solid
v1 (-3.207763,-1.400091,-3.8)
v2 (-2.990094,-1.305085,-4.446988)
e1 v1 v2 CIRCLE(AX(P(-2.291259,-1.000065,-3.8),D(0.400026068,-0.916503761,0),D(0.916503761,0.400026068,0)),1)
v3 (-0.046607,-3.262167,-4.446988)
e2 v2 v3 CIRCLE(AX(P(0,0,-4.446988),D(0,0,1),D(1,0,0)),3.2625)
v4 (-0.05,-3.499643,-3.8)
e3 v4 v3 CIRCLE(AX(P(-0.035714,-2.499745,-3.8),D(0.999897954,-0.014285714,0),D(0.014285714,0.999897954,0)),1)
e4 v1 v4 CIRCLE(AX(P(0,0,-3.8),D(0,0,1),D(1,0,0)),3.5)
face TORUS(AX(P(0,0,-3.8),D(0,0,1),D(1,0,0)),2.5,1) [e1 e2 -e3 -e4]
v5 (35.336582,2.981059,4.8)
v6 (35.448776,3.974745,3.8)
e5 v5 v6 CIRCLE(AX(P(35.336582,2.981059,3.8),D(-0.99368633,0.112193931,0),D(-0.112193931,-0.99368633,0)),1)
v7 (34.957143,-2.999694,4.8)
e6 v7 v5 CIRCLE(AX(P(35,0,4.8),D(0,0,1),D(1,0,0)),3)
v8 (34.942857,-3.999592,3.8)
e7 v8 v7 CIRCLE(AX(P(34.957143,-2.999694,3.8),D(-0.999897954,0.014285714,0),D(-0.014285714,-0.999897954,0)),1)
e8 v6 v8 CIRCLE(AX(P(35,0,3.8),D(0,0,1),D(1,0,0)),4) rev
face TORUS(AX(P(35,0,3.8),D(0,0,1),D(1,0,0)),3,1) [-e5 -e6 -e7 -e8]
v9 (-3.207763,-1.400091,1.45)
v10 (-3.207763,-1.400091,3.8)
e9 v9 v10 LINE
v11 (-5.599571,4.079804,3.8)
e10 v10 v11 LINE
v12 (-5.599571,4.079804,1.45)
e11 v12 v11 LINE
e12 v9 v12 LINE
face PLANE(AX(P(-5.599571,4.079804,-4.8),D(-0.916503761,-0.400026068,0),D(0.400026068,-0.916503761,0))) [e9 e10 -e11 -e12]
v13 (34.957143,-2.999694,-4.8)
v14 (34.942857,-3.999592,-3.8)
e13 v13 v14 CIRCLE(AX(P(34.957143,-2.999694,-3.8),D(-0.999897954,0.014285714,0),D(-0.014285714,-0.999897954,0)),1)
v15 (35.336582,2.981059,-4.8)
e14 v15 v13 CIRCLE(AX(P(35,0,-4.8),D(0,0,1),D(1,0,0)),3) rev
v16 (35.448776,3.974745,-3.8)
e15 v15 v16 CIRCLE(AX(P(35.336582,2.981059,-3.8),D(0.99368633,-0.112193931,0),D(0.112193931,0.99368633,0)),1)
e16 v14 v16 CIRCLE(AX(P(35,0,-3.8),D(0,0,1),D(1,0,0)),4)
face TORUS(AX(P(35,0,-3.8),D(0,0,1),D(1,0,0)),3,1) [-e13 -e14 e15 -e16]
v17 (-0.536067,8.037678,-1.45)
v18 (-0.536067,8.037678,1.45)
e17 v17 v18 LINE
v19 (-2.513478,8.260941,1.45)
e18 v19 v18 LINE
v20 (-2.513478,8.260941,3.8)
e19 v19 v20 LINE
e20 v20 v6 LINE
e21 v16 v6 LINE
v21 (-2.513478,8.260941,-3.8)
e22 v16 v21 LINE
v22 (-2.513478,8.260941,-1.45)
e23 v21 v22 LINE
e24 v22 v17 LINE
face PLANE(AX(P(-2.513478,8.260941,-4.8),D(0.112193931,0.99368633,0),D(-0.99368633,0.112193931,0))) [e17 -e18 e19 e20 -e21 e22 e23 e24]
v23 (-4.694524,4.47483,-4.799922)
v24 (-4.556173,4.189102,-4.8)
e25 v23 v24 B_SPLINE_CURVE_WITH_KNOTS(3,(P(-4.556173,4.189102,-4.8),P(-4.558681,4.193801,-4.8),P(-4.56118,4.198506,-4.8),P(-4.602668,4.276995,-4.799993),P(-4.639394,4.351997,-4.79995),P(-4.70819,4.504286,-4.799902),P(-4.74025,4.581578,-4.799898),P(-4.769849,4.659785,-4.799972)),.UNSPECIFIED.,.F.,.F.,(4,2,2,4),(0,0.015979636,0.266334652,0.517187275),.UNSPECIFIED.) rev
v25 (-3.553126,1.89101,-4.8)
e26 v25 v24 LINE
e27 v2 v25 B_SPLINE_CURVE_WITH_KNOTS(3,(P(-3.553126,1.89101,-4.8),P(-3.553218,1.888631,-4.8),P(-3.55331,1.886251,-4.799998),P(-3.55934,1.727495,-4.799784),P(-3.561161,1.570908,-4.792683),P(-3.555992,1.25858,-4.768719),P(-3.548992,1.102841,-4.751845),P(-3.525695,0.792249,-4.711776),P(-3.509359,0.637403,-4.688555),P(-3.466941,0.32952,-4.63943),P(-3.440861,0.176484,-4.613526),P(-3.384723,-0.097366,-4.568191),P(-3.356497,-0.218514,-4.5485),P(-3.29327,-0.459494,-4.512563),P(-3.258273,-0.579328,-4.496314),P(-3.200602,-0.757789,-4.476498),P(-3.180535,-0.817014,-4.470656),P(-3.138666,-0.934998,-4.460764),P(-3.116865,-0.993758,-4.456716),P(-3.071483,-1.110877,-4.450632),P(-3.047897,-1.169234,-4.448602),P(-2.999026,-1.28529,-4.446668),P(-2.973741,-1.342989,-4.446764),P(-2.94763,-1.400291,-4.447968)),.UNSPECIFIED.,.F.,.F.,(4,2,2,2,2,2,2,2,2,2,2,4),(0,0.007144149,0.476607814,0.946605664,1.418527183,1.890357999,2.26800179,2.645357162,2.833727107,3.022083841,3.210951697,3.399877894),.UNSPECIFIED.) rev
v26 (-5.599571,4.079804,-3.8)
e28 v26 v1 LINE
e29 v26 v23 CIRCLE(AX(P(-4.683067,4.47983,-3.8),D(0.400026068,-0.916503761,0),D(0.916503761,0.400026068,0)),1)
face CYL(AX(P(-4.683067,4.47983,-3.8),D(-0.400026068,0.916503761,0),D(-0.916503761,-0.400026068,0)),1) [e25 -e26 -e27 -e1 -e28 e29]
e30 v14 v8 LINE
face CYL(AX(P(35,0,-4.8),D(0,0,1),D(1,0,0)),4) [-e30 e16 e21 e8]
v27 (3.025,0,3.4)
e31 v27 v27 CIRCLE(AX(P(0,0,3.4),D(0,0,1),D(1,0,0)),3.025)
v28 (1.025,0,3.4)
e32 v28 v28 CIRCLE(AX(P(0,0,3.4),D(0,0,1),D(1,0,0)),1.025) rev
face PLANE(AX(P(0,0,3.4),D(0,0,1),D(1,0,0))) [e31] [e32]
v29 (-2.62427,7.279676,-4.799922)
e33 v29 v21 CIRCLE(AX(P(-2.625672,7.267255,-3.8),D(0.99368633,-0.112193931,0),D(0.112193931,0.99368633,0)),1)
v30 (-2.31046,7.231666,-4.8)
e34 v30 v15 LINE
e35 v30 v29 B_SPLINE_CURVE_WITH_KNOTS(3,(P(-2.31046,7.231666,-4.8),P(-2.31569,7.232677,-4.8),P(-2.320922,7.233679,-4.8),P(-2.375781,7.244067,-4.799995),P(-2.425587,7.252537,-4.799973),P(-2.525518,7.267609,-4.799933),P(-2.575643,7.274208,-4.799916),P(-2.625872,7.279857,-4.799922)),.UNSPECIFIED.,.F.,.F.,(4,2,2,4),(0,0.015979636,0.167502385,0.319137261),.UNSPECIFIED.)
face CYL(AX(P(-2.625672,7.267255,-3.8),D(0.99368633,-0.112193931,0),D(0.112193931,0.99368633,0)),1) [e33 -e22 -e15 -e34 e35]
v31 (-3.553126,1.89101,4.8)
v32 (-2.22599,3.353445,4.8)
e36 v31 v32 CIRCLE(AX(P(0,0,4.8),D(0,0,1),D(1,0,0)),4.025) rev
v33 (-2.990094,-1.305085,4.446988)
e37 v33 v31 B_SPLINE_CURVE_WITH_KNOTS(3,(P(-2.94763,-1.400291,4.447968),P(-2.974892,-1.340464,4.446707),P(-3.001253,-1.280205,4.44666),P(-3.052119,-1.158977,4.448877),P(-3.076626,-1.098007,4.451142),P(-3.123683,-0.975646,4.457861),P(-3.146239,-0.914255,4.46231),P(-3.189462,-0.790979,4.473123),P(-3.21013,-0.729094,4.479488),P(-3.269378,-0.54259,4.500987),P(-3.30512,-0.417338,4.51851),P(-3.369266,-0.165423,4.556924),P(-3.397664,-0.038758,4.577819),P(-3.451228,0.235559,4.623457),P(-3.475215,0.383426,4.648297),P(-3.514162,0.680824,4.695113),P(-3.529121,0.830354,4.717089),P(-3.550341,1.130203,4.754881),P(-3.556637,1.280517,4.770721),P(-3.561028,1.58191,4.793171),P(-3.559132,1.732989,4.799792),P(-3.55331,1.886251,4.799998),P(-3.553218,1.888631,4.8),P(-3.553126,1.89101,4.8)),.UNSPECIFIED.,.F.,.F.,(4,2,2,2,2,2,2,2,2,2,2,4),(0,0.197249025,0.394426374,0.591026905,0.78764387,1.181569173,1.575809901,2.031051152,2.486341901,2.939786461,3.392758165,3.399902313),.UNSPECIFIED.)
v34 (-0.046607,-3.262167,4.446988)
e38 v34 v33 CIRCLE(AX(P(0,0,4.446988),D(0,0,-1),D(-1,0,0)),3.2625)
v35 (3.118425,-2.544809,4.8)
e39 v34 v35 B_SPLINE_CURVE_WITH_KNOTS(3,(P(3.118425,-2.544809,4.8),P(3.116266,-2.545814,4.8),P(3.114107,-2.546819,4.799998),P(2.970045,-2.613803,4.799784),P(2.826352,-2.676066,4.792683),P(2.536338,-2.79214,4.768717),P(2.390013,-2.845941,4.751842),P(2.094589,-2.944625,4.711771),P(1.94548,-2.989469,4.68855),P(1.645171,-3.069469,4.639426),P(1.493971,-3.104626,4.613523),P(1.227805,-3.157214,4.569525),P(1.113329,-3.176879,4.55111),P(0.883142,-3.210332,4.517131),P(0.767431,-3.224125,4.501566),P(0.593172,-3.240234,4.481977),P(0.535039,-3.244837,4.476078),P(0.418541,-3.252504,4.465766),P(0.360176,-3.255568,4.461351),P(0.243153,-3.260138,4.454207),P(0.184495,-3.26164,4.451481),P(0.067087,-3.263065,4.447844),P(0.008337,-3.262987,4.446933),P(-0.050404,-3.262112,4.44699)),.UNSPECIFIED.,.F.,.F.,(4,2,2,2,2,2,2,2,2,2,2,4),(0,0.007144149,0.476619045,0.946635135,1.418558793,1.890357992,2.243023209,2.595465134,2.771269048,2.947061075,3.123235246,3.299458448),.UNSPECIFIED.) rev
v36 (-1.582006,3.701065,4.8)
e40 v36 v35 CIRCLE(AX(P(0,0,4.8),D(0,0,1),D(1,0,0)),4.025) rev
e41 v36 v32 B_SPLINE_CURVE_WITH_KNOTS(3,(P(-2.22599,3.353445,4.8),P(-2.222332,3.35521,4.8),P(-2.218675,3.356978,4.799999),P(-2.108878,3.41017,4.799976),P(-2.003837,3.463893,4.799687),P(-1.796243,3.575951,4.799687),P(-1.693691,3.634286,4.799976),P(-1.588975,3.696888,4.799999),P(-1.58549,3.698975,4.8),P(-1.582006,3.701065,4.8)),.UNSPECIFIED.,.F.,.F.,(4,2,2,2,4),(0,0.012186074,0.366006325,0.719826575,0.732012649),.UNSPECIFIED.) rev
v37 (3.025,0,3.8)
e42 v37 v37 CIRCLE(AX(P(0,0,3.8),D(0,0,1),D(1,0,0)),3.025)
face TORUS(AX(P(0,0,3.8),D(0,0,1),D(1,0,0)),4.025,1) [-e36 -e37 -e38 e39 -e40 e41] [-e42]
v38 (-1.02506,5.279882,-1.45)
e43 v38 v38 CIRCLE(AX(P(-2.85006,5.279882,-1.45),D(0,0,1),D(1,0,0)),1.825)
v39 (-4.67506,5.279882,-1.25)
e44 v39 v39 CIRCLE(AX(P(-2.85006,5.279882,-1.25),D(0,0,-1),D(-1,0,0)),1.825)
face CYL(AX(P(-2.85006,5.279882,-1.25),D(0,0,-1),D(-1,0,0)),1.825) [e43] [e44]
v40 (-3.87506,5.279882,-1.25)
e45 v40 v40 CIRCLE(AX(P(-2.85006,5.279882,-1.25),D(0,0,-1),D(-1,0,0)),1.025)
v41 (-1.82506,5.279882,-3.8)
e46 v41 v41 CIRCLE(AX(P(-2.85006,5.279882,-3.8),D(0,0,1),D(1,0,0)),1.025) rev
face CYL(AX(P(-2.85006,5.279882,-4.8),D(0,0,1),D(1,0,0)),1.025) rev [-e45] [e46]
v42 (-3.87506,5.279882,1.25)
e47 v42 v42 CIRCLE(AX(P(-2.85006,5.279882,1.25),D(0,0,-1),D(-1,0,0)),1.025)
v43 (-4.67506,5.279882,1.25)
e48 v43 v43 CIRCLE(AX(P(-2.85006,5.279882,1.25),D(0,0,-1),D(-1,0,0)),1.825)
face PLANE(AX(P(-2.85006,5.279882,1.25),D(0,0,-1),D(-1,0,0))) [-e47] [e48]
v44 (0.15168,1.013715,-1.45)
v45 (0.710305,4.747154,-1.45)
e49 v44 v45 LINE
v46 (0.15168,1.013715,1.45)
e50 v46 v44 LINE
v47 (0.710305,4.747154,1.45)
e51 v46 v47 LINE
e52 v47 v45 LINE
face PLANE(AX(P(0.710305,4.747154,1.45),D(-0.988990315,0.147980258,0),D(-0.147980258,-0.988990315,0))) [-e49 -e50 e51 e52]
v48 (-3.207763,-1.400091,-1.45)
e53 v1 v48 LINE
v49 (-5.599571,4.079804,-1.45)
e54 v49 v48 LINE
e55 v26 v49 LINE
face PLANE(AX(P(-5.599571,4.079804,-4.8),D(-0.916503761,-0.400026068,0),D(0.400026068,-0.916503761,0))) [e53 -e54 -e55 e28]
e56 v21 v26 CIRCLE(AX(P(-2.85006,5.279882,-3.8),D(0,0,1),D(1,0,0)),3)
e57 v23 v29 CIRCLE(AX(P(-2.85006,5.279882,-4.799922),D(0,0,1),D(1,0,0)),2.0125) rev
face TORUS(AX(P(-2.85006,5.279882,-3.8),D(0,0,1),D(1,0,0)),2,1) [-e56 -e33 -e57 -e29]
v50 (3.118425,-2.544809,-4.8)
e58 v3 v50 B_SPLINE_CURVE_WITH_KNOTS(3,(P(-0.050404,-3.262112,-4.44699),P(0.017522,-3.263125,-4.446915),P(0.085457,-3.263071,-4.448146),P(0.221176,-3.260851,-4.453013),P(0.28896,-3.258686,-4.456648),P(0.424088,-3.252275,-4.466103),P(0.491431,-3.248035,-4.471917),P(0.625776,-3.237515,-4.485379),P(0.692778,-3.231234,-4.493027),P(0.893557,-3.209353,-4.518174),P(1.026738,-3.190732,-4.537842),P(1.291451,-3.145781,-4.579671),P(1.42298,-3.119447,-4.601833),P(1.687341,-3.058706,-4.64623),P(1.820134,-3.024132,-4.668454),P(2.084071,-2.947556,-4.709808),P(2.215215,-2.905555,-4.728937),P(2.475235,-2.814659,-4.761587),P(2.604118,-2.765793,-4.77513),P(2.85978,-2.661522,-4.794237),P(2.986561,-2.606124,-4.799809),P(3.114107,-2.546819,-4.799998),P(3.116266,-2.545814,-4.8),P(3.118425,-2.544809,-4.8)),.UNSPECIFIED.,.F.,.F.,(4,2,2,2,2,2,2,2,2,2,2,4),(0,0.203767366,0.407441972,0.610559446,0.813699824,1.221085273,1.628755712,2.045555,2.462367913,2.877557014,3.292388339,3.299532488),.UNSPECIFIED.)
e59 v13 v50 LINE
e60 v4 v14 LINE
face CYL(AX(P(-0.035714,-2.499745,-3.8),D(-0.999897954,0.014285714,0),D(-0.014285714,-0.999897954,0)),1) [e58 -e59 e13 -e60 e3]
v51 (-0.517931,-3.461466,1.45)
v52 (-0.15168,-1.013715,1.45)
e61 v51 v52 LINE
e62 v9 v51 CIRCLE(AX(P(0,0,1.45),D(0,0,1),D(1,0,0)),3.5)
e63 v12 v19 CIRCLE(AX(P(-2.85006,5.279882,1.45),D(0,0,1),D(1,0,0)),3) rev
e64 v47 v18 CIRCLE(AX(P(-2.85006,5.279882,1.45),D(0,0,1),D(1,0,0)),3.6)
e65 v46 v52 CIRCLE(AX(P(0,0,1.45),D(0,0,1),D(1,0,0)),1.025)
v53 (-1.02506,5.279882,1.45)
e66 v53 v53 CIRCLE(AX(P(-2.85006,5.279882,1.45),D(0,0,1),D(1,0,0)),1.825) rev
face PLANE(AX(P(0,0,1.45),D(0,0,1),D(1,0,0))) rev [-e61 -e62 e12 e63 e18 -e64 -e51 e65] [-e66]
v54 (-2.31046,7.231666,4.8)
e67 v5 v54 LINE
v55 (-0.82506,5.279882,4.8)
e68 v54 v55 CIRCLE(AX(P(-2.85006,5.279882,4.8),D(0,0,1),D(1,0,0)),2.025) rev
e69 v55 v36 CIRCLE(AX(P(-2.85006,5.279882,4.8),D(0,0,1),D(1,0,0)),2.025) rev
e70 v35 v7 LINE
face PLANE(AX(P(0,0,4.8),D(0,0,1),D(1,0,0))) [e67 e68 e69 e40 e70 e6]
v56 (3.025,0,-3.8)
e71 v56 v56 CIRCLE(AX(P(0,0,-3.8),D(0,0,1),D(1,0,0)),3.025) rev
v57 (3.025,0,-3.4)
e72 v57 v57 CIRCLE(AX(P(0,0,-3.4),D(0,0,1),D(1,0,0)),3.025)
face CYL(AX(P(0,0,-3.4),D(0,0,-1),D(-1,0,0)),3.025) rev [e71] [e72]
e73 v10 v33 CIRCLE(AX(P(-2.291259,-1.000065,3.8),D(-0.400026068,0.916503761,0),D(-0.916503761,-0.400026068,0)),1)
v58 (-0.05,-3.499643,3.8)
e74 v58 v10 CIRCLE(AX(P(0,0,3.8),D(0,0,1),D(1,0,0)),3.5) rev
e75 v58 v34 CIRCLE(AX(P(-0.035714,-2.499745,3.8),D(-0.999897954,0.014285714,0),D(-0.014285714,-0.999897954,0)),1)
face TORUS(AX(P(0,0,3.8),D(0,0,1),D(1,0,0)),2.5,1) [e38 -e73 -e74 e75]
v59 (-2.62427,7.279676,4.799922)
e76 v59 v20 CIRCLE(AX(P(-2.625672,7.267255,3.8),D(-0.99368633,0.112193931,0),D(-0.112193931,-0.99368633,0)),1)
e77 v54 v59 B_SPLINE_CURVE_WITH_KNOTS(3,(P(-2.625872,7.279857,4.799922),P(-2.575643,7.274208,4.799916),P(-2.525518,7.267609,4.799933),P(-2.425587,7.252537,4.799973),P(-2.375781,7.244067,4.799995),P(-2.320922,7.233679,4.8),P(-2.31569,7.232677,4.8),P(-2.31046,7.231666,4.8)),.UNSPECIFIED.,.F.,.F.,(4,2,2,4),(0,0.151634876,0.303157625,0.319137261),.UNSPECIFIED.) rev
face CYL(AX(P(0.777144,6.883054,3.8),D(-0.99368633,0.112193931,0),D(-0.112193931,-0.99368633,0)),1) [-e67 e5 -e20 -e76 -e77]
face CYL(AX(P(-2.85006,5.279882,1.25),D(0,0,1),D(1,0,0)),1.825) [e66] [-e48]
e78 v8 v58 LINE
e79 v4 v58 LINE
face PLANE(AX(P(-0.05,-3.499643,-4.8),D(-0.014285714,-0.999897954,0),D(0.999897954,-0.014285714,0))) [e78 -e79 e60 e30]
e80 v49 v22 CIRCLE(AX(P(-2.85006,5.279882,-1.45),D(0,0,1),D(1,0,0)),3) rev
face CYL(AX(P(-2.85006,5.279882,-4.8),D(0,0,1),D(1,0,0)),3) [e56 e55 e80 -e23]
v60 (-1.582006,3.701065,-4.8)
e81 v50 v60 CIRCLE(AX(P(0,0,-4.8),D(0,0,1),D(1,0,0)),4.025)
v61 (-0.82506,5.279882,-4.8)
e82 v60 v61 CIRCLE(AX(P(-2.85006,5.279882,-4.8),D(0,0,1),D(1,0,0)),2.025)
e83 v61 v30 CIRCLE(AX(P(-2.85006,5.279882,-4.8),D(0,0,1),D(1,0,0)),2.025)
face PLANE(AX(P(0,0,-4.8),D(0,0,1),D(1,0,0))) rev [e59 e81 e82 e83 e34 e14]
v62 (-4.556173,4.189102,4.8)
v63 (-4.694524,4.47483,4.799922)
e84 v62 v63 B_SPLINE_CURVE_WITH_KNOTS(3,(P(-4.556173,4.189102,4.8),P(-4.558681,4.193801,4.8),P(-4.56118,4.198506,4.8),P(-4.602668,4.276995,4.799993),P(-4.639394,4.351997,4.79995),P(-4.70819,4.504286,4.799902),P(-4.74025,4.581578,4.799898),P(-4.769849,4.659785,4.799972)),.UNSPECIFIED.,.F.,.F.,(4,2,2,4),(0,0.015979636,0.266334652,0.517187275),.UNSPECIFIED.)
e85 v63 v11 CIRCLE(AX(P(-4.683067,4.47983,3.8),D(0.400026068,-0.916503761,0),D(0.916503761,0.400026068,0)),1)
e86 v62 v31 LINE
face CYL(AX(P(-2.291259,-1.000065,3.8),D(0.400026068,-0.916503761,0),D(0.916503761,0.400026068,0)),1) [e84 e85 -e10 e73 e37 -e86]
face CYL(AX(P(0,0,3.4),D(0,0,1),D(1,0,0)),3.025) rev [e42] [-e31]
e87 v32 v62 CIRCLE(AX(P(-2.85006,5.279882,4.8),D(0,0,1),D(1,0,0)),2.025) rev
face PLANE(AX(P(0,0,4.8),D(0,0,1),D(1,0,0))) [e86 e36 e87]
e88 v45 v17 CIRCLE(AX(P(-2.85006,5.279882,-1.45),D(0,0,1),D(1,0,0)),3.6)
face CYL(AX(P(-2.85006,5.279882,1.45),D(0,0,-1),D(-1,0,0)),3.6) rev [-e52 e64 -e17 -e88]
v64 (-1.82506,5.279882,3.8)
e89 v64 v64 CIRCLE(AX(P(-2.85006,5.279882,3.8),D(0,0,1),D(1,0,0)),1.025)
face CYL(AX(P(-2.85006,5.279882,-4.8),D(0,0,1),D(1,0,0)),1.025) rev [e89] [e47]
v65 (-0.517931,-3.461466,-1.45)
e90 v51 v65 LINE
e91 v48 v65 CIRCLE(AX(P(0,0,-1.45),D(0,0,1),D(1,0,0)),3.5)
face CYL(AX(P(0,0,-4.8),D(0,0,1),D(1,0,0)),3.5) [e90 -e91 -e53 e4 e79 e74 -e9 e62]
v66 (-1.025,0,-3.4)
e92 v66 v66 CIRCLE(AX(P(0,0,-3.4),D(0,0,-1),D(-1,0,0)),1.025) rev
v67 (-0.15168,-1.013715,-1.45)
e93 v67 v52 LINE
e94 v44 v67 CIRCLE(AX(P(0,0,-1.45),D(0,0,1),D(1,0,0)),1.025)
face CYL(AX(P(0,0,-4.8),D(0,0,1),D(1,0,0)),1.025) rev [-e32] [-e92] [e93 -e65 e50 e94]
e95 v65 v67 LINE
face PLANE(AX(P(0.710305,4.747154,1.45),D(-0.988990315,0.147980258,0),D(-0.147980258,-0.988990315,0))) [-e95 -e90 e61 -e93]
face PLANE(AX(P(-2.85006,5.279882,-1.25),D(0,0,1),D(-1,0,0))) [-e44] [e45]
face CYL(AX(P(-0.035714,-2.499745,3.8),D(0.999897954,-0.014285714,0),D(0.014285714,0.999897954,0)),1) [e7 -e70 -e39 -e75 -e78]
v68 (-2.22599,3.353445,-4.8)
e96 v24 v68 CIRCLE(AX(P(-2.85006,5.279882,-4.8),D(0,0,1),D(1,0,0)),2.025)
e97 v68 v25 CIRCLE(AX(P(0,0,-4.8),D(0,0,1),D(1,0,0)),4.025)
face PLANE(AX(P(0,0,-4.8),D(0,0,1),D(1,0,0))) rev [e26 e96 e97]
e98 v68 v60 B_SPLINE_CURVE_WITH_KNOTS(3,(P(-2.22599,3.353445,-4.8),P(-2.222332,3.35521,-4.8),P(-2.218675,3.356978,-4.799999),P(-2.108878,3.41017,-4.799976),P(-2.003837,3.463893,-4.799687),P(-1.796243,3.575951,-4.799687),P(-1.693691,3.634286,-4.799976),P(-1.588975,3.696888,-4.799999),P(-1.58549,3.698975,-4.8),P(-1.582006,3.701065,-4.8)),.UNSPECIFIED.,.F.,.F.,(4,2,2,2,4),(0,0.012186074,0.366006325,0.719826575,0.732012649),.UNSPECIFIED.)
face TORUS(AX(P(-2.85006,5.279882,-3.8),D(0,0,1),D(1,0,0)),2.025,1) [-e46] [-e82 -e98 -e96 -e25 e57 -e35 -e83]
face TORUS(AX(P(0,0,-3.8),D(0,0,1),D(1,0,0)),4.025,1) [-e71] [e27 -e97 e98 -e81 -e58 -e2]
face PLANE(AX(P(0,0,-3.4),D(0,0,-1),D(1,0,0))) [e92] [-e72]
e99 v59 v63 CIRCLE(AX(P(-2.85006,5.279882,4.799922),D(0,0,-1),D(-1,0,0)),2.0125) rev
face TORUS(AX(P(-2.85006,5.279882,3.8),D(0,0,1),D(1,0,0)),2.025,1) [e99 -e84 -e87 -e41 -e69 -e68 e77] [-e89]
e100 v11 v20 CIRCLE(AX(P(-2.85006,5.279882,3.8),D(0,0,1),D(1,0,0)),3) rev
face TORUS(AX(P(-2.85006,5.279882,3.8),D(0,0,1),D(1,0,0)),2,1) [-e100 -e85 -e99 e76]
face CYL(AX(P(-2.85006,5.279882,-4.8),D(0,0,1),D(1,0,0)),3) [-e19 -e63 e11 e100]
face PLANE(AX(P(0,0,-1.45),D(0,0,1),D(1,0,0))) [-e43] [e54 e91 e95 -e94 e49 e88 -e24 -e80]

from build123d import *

# Parameters (mm, degrees)
EXTRUDE_1_DEPTH          = 4.8
EXTRUDE_1_DEPTH_BACK     = 4.8
CUT_EXTRUDE_1_DEPTH      = 1.45
CUT_EXTRUDE_1_DEPTH_BACK = 1.45
CUT_EXTRUDE_2_DEPTH      = 41.157146976
CUT_EXTRUDE_2_DEPTH_BACK = 41.157146976
SKETCH_4_R               = 1.025
SKETCH_5_R               = 1.825
SKETCH_5_R_2             = 1.025
EXTRUDE_2_DEPTH          = 0.2
SKETCH_6_R               = 3.025
CUT_EXTRUDE_3_DEPTH      = 1.4
FILLET_1_R               = 1


with BuildPart() as part:
    # 草图2 → 凸台-拉伸1 (new, two sides: drawn at the far end of the back side and taken through both)
    with BuildSketch(Plane.XY.offset(-EXTRUDE_1_DEPTH_BACK)):
        with BuildLine():
            Line((-5.59957118, 4.079804236), (-3.207763165, -1.40009124))
            ThreePointArc((-3.207763165, -1.40009124), (-1.937855629, -2.914569533), (-0.05, -3.499642839))
            Line((-0.05, -3.499642839), (34.942857143, -3.999591816))
            ThreePointArc((34.942857143, -3.999591816), (38.991974106, -0.25326417), (35.448775724, 3.974745319))
            Line((35.448775724, 3.974745319), (-2.513478103, 8.26094143))
            ThreePointArc((-2.513478103, 8.26094143), (-5.263777825, 7.06144517), (-5.59957118, 4.079804236))
        make_face()
    extrude(amount=EXTRUDE_1_DEPTH + EXTRUDE_1_DEPTH_BACK)

    # 草图3 → 切除-拉伸1 (cut, two sides: drawn at the far end of the back side and taken through both)
    with BuildSketch(Plane.XY.offset(-CUT_EXTRUDE_1_DEPTH_BACK)):
        with BuildLine():
            Line((0.710305238, 4.747153512), (-0.517930903, -3.461466103))
            ThreePointArc((-0.517930903, -3.461466103), (-2.128970562, -2.778036059), (-3.207763165, -1.40009124))
            Line((-3.207763165, -1.40009124), (-4.803529355, 2.255984778))
            ThreePointArc((-4.803529355, 2.255984778), (-4.332290932, 8.560582238), (0.710305238, 4.747153512))
        make_face()
    extrude(amount=CUT_EXTRUDE_1_DEPTH + CUT_EXTRUDE_1_DEPTH_BACK, mode=Mode.SUBTRACT)

    # 草图4 → 切除-拉伸2 (cut, two sides: drawn at the far end of the back side and taken through both)
    with BuildSketch(Plane.XY.offset(-CUT_EXTRUDE_2_DEPTH_BACK)):
        with Locations((-2.850059896, 5.279882441)):
            Circle(SKETCH_4_R)
        Circle(SKETCH_4_R)
    extrude(amount=CUT_EXTRUDE_2_DEPTH + CUT_EXTRUDE_2_DEPTH_BACK, mode=Mode.SUBTRACT)

    # 草图5 → 凸台-拉伸2 (add)
    with BuildSketch(Plane(origin=(0, 0, 1.45), x_dir=(-1, 0, 0), z_dir=(0, 0, -1))):
        with Locations(Location((2.850059896, 5.279882441, 0), (0, 0, 180))):
            Circle(SKETCH_5_R)
        with Locations(Location((2.850059896, 5.279882441, 0), (0, 0, 180))):
            Circle(SKETCH_5_R_2, mode=Mode.SUBTRACT)
    extrude_2 = extrude(amount=EXTRUDE_2_DEPTH)

    # 镜向1: 凸台-拉伸2 across plane
    add(extrude_2.mirror(Plane.XY))

    # 草图6 → 切除-拉伸3 (cut)
    with BuildSketch(Plane.XY.offset(4.8)):
        Circle(SKETCH_6_R)
    cut_extrude_3 = extrude(amount=-CUT_EXTRUDE_3_DEPTH, mode=Mode.SUBTRACT)

    # 镜向2: 切除-拉伸3 across plane
    add(cut_extrude_3.mirror(Plane.XY), mode=Mode.SUBTRACT)

    # 圆角1
    # the kernel refuses this fillet: 1 mm, written as the material it takes off along each edge
    with BuildSketch(Plane(origin=(-5.59957118, 4.079804236, 4.8), x_dir=(0, 0, -1), z_dir=(0.40002606845012584, -0.9165037613454379, 0))) as fillet_1_piece_1:
        with BuildLine():
            CenterArc((FILLET_1_R, FILLET_1_R), FILLET_1_R, 180, 90)
            Line((0, FILLET_1_R), (0, 0))
            Line((0, 0), (FILLET_1_R, 0))
        make_face()
    extrude(amount=5.979130372, mode=Mode.SUBTRACT)
    with BuildSketch(Plane(origin=(-2.850059896, 5.279882441, 4.8), x_dir=(0.11219393088675805, 0.9936863297198856, 0), z_dir=(0.9936863297198856, -0.11219393088675805, 0))) as fillet_1_piece_2:
        with BuildLine():
            CenterArc((3 - FILLET_1_R, -FILLET_1_R), FILLET_1_R, 0, 90)
            Line((3 - FILLET_1_R, 0), (3, 0))
            Line((3, 0), (3, -FILLET_1_R))
        make_face()
    revolve(axis=Axis((-2.850059896, 5.279882441, 4.8), (0, 0, 1)), revolution_arc=120.021609732, mode=Mode.SUBTRACT)
    with BuildSketch(Plane(origin=(0, 0, 4.8), x_dir=(-0.9165037613454377, -0.40002606845012634, 0), z_dir=(-0.40002606845012634, 0.9165037613454377, 0))) as fillet_1_piece_3:
        with BuildLine():
            CenterArc((3.5 - FILLET_1_R, -FILLET_1_R), FILLET_1_R, 0, 90)
            Line((3.5, -FILLET_1_R), (3.5, 0))
            Line((3.5, 0), (3.5 - FILLET_1_R, 0))
        make_face()
    revolve(axis=Axis((0, 0, 4.8), (0, 0, 1)), revolution_arc=65.601652868, mode=Mode.SUBTRACT)
    with BuildSketch(Plane(origin=(35.448775724, 3.974745319, 4.8), x_dir=(-0.1121939308867587, -0.9936863297198857, 0), z_dir=(-0.9936863297198857, 0.1121939308867587, 0))) as fillet_1_piece_4:
        with BuildLine():
            CenterArc((FILLET_1_R, -FILLET_1_R), FILLET_1_R, 90, 90)
            Line((0, -FILLET_1_R), (0, 0))
            Line((0, 0), (FILLET_1_R, 0))
        make_face()
    extrude(amount=38.203457863, mode=Mode.SUBTRACT)
    with BuildSketch(Plane(origin=(-0.05, -3.499642839, 4.8), x_dir=(0.014285714285714275, 0.9998979539769781, 0), z_dir=(0.9998979539769781, -0.014285714285714275, 0))) as fillet_1_piece_5:
        with BuildLine():
            CenterArc((FILLET_1_R, -FILLET_1_R), FILLET_1_R, 90, 90)
            Line((0, -FILLET_1_R), (0, 0))
            Line((0, 0), (FILLET_1_R, 0))
        make_face()
    extrude(amount=34.996428389, mode=Mode.SUBTRACT)
    with BuildSketch(Plane(origin=(35, 0, 4.8), x_dir=(-0.014285714285714242, -0.9998979539769781, 0), z_dir=(-0.9998979539769781, 0.014285714285714242, 0))) as fillet_1_piece_6:
        with BuildLine():
            CenterArc((4 - FILLET_1_R, -FILLET_1_R), FILLET_1_R, 0, 90)
            Line((4, -FILLET_1_R), (4, 0))
            Line((4, 0), (4 - FILLET_1_R, 0))
        make_face()
    revolve(axis=Axis((35, 0, 4.8), (0, 0, 1)), revolution_arc=174.3767374, mode=Mode.SUBTRACT)
    # the kernel refuses this fillet: 1 mm, written as the material it takes off along each edge
    with BuildSketch(Plane(origin=(0, 0, 4.8), x_dir=(-0.9475894723190804, 0.31949051934298006, 0), z_dir=(0.31949051934298006, 0.9475894723190804, 0))) as fillet_1_2_piece_1:
        with BuildLine():
            CenterArc((3.025 + FILLET_1_R, -FILLET_1_R), FILLET_1_R, 90, 90)
            Line((3.025, -FILLET_1_R), (3.025, 0))
            Line((3.025, 0), (3.025 + FILLET_1_R, 0))
        make_face()
    revolve(axis=Axis((0, 0, 4.8), (0, 0, 1)), revolution_arc=198.63211646, mode=Mode.SUBTRACT)
    with BuildSketch(Plane(origin=(0, 0, 4.8), x_dir=(1, 0, 0), z_dir=(0, -1, 0))) as fillet_1_2_piece_2:
        with BuildLine():
            CenterArc((3.025 + FILLET_1_R, -FILLET_1_R), FILLET_1_R, 90, 90)
            Line((3.025, -FILLET_1_R), (3.025, 0))
            Line((3.025, 0), (3.025 + FILLET_1_R, 0))
        make_face()
    revolve(axis=Axis((0, 0, 4.8), (0, 0, 1)), revolution_arc=311.572966215, mode=Mode.SUBTRACT)
    # the kernel refuses this fillet: 1 mm, written as the material it takes off along each edge
    with BuildSketch(Plane(origin=(-2.850059896, 5.279882441, 4.8), x_dir=(1, 0, 0), z_dir=(0, 1, 0))) as fillet_1_3_piece_1:
        with BuildLine():
            CenterArc((1.025 + FILLET_1_R, FILLET_1_R), FILLET_1_R, 180, 90)
            Line((1.025, FILLET_1_R), (1.025, 0))
            Line((1.025, 0), (1.025 + FILLET_1_R, 0))
        make_face()
    revolve(axis=Axis((-2.850059896, 5.279882441, 4.8), (0, 0, -1)), mode=Mode.SUBTRACT)
    # the kernel refuses this fillet: 1 mm, written as the material it takes off along each edge
    with BuildSketch(Plane(origin=(0, 0, -4.8), x_dir=(-0.9165037613454377, -0.40002606845012634, 0), z_dir=(-0.40002606845012634, 0.9165037613454377, 0))) as fillet_1_4_piece_1:
        with BuildLine():
            CenterArc((3.5 - FILLET_1_R, FILLET_1_R), FILLET_1_R, 270, 90)
            Line((3.5 - FILLET_1_R, 0), (3.5, 0))
            Line((3.5, 0), (3.5, FILLET_1_R))
        make_face()
    revolve(axis=Axis((0, 0, -4.8), (0, 0, 1)), revolution_arc=65.601652868, mode=Mode.SUBTRACT)
    with BuildSketch(Plane(origin=(35.448775724, 3.974745319, -4.8), x_dir=(0, 0, 1), z_dir=(-0.9936863297198857, 0.1121939308867587, 0))) as fillet_1_4_piece_2:
        with BuildLine():
            CenterArc((FILLET_1_R, -FILLET_1_R), FILLET_1_R, 90, 90)
            Line((0, -FILLET_1_R), (0, 0))
            Line((0, 0), (FILLET_1_R, 0))
        make_face()
    extrude(amount=38.203457863, mode=Mode.SUBTRACT)
    with BuildSketch(Plane(origin=(-0.05, -3.499642839, -4.8), x_dir=(0.014285714285714275, 0.9998979539769781, 0), z_dir=(0.9998979539769781, -0.014285714285714275, 0))) as fillet_1_4_piece_3:
        with BuildLine():
            CenterArc((FILLET_1_R, FILLET_1_R), FILLET_1_R, 180, 90)
            Line((0, FILLET_1_R), (0, 0))
            Line((0, 0), (FILLET_1_R, 0))
        make_face()
    extrude(amount=34.996428389, mode=Mode.SUBTRACT)
    with BuildSketch(Plane(origin=(35, 0, -4.8), x_dir=(-0.014285714285714242, -0.9998979539769781, 0), z_dir=(-0.9998979539769781, 0.014285714285714242, 0))) as fillet_1_4_piece_4:
        with BuildLine():
            CenterArc((4 - FILLET_1_R, FILLET_1_R), FILLET_1_R, 270, 90)
            Line((4, FILLET_1_R), (4, 0))
            Line((4, 0), (4 - FILLET_1_R, 0))
        make_face()
    revolve(axis=Axis((35, 0, -4.8), (0, 0, 1)), revolution_arc=174.3767374, mode=Mode.SUBTRACT)
    with BuildSketch(Plane(origin=(-5.59957118, 4.079804236, -4.8), x_dir=(0, 0, 1), z_dir=(0.40002606845012584, -0.9165037613454379, 0))) as fillet_1_4_piece_5:
        with BuildLine():
            CenterArc((FILLET_1_R, -FILLET_1_R), FILLET_1_R, 90, 90)
            Line((0, -FILLET_1_R), (0, 0))
            Line((0, 0), (FILLET_1_R, 0))
        make_face()
    extrude(amount=5.979130372, mode=Mode.SUBTRACT)
    with BuildSketch(Plane(origin=(-2.850059896, 5.279882441, -4.8), x_dir=(0.11219393088675805, 0.9936863297198856, 0), z_dir=(0.9936863297198856, -0.11219393088675805, 0))) as fillet_1_4_piece_6:
        with BuildLine():
            CenterArc((3 - FILLET_1_R, FILLET_1_R), FILLET_1_R, 270, 90)
            Line((3, FILLET_1_R), (3, 0))
            Line((3, 0), (3 - FILLET_1_R, 0))
        make_face()
    revolve(axis=Axis((-2.850059896, 5.279882441, -4.8), (0, 0, 1)), revolution_arc=120.021609732, mode=Mode.SUBTRACT)
    # the kernel refuses this fillet: 1 mm, written as the material it takes off along each edge
    with BuildSketch(Plane(origin=(0, 0, -4.8), x_dir=(1, 0, 0), z_dir=(0, -1, 0))) as fillet_1_5_piece_1:
        with BuildLine():
            CenterArc((3.025 + FILLET_1_R, FILLET_1_R), FILLET_1_R, 180, 90)
            Line((3.025 + FILLET_1_R, 0), (3.025, 0))
            Line((3.025, 0), (3.025, FILLET_1_R))
        make_face()
    revolve(axis=Axis((0, 0, -4.8), (0, 0, 1)), revolution_arc=311.572966215, mode=Mode.SUBTRACT)
    with BuildSketch(Plane(origin=(0, 0, -4.8), x_dir=(-0.9475894723190804, 0.31949051934298006, 0), z_dir=(0.31949051934298006, 0.9475894723190804, 0))) as fillet_1_5_piece_2:
        with BuildLine():
            CenterArc((3.025 + FILLET_1_R, FILLET_1_R), FILLET_1_R, 180, 90)
            Line((3.025 + FILLET_1_R, 0), (3.025, 0))
            Line((3.025, 0), (3.025, FILLET_1_R))
        make_face()
    revolve(axis=Axis((0, 0, -4.8), (0, 0, 1)), revolution_arc=198.63211646, mode=Mode.SUBTRACT)
    # the kernel refuses this fillet: 1 mm, written as the material it takes off along each edge
    with BuildSketch(Plane(origin=(-2.850059896, 5.279882441, -4.8), x_dir=(1, 0, 0), z_dir=(0, -1, 0))) as fillet_1_6_piece_1:
        with BuildLine():
            CenterArc((1.025 + FILLET_1_R, FILLET_1_R), FILLET_1_R, 180, 90)
            Line((1.025, FILLET_1_R), (1.025, 0))
            Line((1.025, 0), (1.025 + FILLET_1_R, 0))
        make_face()
    revolve(axis=Axis((-2.850059896, 5.279882441, -4.8), (0, 0, 1)), mode=Mode.SUBTRACT)


solid = part.part
